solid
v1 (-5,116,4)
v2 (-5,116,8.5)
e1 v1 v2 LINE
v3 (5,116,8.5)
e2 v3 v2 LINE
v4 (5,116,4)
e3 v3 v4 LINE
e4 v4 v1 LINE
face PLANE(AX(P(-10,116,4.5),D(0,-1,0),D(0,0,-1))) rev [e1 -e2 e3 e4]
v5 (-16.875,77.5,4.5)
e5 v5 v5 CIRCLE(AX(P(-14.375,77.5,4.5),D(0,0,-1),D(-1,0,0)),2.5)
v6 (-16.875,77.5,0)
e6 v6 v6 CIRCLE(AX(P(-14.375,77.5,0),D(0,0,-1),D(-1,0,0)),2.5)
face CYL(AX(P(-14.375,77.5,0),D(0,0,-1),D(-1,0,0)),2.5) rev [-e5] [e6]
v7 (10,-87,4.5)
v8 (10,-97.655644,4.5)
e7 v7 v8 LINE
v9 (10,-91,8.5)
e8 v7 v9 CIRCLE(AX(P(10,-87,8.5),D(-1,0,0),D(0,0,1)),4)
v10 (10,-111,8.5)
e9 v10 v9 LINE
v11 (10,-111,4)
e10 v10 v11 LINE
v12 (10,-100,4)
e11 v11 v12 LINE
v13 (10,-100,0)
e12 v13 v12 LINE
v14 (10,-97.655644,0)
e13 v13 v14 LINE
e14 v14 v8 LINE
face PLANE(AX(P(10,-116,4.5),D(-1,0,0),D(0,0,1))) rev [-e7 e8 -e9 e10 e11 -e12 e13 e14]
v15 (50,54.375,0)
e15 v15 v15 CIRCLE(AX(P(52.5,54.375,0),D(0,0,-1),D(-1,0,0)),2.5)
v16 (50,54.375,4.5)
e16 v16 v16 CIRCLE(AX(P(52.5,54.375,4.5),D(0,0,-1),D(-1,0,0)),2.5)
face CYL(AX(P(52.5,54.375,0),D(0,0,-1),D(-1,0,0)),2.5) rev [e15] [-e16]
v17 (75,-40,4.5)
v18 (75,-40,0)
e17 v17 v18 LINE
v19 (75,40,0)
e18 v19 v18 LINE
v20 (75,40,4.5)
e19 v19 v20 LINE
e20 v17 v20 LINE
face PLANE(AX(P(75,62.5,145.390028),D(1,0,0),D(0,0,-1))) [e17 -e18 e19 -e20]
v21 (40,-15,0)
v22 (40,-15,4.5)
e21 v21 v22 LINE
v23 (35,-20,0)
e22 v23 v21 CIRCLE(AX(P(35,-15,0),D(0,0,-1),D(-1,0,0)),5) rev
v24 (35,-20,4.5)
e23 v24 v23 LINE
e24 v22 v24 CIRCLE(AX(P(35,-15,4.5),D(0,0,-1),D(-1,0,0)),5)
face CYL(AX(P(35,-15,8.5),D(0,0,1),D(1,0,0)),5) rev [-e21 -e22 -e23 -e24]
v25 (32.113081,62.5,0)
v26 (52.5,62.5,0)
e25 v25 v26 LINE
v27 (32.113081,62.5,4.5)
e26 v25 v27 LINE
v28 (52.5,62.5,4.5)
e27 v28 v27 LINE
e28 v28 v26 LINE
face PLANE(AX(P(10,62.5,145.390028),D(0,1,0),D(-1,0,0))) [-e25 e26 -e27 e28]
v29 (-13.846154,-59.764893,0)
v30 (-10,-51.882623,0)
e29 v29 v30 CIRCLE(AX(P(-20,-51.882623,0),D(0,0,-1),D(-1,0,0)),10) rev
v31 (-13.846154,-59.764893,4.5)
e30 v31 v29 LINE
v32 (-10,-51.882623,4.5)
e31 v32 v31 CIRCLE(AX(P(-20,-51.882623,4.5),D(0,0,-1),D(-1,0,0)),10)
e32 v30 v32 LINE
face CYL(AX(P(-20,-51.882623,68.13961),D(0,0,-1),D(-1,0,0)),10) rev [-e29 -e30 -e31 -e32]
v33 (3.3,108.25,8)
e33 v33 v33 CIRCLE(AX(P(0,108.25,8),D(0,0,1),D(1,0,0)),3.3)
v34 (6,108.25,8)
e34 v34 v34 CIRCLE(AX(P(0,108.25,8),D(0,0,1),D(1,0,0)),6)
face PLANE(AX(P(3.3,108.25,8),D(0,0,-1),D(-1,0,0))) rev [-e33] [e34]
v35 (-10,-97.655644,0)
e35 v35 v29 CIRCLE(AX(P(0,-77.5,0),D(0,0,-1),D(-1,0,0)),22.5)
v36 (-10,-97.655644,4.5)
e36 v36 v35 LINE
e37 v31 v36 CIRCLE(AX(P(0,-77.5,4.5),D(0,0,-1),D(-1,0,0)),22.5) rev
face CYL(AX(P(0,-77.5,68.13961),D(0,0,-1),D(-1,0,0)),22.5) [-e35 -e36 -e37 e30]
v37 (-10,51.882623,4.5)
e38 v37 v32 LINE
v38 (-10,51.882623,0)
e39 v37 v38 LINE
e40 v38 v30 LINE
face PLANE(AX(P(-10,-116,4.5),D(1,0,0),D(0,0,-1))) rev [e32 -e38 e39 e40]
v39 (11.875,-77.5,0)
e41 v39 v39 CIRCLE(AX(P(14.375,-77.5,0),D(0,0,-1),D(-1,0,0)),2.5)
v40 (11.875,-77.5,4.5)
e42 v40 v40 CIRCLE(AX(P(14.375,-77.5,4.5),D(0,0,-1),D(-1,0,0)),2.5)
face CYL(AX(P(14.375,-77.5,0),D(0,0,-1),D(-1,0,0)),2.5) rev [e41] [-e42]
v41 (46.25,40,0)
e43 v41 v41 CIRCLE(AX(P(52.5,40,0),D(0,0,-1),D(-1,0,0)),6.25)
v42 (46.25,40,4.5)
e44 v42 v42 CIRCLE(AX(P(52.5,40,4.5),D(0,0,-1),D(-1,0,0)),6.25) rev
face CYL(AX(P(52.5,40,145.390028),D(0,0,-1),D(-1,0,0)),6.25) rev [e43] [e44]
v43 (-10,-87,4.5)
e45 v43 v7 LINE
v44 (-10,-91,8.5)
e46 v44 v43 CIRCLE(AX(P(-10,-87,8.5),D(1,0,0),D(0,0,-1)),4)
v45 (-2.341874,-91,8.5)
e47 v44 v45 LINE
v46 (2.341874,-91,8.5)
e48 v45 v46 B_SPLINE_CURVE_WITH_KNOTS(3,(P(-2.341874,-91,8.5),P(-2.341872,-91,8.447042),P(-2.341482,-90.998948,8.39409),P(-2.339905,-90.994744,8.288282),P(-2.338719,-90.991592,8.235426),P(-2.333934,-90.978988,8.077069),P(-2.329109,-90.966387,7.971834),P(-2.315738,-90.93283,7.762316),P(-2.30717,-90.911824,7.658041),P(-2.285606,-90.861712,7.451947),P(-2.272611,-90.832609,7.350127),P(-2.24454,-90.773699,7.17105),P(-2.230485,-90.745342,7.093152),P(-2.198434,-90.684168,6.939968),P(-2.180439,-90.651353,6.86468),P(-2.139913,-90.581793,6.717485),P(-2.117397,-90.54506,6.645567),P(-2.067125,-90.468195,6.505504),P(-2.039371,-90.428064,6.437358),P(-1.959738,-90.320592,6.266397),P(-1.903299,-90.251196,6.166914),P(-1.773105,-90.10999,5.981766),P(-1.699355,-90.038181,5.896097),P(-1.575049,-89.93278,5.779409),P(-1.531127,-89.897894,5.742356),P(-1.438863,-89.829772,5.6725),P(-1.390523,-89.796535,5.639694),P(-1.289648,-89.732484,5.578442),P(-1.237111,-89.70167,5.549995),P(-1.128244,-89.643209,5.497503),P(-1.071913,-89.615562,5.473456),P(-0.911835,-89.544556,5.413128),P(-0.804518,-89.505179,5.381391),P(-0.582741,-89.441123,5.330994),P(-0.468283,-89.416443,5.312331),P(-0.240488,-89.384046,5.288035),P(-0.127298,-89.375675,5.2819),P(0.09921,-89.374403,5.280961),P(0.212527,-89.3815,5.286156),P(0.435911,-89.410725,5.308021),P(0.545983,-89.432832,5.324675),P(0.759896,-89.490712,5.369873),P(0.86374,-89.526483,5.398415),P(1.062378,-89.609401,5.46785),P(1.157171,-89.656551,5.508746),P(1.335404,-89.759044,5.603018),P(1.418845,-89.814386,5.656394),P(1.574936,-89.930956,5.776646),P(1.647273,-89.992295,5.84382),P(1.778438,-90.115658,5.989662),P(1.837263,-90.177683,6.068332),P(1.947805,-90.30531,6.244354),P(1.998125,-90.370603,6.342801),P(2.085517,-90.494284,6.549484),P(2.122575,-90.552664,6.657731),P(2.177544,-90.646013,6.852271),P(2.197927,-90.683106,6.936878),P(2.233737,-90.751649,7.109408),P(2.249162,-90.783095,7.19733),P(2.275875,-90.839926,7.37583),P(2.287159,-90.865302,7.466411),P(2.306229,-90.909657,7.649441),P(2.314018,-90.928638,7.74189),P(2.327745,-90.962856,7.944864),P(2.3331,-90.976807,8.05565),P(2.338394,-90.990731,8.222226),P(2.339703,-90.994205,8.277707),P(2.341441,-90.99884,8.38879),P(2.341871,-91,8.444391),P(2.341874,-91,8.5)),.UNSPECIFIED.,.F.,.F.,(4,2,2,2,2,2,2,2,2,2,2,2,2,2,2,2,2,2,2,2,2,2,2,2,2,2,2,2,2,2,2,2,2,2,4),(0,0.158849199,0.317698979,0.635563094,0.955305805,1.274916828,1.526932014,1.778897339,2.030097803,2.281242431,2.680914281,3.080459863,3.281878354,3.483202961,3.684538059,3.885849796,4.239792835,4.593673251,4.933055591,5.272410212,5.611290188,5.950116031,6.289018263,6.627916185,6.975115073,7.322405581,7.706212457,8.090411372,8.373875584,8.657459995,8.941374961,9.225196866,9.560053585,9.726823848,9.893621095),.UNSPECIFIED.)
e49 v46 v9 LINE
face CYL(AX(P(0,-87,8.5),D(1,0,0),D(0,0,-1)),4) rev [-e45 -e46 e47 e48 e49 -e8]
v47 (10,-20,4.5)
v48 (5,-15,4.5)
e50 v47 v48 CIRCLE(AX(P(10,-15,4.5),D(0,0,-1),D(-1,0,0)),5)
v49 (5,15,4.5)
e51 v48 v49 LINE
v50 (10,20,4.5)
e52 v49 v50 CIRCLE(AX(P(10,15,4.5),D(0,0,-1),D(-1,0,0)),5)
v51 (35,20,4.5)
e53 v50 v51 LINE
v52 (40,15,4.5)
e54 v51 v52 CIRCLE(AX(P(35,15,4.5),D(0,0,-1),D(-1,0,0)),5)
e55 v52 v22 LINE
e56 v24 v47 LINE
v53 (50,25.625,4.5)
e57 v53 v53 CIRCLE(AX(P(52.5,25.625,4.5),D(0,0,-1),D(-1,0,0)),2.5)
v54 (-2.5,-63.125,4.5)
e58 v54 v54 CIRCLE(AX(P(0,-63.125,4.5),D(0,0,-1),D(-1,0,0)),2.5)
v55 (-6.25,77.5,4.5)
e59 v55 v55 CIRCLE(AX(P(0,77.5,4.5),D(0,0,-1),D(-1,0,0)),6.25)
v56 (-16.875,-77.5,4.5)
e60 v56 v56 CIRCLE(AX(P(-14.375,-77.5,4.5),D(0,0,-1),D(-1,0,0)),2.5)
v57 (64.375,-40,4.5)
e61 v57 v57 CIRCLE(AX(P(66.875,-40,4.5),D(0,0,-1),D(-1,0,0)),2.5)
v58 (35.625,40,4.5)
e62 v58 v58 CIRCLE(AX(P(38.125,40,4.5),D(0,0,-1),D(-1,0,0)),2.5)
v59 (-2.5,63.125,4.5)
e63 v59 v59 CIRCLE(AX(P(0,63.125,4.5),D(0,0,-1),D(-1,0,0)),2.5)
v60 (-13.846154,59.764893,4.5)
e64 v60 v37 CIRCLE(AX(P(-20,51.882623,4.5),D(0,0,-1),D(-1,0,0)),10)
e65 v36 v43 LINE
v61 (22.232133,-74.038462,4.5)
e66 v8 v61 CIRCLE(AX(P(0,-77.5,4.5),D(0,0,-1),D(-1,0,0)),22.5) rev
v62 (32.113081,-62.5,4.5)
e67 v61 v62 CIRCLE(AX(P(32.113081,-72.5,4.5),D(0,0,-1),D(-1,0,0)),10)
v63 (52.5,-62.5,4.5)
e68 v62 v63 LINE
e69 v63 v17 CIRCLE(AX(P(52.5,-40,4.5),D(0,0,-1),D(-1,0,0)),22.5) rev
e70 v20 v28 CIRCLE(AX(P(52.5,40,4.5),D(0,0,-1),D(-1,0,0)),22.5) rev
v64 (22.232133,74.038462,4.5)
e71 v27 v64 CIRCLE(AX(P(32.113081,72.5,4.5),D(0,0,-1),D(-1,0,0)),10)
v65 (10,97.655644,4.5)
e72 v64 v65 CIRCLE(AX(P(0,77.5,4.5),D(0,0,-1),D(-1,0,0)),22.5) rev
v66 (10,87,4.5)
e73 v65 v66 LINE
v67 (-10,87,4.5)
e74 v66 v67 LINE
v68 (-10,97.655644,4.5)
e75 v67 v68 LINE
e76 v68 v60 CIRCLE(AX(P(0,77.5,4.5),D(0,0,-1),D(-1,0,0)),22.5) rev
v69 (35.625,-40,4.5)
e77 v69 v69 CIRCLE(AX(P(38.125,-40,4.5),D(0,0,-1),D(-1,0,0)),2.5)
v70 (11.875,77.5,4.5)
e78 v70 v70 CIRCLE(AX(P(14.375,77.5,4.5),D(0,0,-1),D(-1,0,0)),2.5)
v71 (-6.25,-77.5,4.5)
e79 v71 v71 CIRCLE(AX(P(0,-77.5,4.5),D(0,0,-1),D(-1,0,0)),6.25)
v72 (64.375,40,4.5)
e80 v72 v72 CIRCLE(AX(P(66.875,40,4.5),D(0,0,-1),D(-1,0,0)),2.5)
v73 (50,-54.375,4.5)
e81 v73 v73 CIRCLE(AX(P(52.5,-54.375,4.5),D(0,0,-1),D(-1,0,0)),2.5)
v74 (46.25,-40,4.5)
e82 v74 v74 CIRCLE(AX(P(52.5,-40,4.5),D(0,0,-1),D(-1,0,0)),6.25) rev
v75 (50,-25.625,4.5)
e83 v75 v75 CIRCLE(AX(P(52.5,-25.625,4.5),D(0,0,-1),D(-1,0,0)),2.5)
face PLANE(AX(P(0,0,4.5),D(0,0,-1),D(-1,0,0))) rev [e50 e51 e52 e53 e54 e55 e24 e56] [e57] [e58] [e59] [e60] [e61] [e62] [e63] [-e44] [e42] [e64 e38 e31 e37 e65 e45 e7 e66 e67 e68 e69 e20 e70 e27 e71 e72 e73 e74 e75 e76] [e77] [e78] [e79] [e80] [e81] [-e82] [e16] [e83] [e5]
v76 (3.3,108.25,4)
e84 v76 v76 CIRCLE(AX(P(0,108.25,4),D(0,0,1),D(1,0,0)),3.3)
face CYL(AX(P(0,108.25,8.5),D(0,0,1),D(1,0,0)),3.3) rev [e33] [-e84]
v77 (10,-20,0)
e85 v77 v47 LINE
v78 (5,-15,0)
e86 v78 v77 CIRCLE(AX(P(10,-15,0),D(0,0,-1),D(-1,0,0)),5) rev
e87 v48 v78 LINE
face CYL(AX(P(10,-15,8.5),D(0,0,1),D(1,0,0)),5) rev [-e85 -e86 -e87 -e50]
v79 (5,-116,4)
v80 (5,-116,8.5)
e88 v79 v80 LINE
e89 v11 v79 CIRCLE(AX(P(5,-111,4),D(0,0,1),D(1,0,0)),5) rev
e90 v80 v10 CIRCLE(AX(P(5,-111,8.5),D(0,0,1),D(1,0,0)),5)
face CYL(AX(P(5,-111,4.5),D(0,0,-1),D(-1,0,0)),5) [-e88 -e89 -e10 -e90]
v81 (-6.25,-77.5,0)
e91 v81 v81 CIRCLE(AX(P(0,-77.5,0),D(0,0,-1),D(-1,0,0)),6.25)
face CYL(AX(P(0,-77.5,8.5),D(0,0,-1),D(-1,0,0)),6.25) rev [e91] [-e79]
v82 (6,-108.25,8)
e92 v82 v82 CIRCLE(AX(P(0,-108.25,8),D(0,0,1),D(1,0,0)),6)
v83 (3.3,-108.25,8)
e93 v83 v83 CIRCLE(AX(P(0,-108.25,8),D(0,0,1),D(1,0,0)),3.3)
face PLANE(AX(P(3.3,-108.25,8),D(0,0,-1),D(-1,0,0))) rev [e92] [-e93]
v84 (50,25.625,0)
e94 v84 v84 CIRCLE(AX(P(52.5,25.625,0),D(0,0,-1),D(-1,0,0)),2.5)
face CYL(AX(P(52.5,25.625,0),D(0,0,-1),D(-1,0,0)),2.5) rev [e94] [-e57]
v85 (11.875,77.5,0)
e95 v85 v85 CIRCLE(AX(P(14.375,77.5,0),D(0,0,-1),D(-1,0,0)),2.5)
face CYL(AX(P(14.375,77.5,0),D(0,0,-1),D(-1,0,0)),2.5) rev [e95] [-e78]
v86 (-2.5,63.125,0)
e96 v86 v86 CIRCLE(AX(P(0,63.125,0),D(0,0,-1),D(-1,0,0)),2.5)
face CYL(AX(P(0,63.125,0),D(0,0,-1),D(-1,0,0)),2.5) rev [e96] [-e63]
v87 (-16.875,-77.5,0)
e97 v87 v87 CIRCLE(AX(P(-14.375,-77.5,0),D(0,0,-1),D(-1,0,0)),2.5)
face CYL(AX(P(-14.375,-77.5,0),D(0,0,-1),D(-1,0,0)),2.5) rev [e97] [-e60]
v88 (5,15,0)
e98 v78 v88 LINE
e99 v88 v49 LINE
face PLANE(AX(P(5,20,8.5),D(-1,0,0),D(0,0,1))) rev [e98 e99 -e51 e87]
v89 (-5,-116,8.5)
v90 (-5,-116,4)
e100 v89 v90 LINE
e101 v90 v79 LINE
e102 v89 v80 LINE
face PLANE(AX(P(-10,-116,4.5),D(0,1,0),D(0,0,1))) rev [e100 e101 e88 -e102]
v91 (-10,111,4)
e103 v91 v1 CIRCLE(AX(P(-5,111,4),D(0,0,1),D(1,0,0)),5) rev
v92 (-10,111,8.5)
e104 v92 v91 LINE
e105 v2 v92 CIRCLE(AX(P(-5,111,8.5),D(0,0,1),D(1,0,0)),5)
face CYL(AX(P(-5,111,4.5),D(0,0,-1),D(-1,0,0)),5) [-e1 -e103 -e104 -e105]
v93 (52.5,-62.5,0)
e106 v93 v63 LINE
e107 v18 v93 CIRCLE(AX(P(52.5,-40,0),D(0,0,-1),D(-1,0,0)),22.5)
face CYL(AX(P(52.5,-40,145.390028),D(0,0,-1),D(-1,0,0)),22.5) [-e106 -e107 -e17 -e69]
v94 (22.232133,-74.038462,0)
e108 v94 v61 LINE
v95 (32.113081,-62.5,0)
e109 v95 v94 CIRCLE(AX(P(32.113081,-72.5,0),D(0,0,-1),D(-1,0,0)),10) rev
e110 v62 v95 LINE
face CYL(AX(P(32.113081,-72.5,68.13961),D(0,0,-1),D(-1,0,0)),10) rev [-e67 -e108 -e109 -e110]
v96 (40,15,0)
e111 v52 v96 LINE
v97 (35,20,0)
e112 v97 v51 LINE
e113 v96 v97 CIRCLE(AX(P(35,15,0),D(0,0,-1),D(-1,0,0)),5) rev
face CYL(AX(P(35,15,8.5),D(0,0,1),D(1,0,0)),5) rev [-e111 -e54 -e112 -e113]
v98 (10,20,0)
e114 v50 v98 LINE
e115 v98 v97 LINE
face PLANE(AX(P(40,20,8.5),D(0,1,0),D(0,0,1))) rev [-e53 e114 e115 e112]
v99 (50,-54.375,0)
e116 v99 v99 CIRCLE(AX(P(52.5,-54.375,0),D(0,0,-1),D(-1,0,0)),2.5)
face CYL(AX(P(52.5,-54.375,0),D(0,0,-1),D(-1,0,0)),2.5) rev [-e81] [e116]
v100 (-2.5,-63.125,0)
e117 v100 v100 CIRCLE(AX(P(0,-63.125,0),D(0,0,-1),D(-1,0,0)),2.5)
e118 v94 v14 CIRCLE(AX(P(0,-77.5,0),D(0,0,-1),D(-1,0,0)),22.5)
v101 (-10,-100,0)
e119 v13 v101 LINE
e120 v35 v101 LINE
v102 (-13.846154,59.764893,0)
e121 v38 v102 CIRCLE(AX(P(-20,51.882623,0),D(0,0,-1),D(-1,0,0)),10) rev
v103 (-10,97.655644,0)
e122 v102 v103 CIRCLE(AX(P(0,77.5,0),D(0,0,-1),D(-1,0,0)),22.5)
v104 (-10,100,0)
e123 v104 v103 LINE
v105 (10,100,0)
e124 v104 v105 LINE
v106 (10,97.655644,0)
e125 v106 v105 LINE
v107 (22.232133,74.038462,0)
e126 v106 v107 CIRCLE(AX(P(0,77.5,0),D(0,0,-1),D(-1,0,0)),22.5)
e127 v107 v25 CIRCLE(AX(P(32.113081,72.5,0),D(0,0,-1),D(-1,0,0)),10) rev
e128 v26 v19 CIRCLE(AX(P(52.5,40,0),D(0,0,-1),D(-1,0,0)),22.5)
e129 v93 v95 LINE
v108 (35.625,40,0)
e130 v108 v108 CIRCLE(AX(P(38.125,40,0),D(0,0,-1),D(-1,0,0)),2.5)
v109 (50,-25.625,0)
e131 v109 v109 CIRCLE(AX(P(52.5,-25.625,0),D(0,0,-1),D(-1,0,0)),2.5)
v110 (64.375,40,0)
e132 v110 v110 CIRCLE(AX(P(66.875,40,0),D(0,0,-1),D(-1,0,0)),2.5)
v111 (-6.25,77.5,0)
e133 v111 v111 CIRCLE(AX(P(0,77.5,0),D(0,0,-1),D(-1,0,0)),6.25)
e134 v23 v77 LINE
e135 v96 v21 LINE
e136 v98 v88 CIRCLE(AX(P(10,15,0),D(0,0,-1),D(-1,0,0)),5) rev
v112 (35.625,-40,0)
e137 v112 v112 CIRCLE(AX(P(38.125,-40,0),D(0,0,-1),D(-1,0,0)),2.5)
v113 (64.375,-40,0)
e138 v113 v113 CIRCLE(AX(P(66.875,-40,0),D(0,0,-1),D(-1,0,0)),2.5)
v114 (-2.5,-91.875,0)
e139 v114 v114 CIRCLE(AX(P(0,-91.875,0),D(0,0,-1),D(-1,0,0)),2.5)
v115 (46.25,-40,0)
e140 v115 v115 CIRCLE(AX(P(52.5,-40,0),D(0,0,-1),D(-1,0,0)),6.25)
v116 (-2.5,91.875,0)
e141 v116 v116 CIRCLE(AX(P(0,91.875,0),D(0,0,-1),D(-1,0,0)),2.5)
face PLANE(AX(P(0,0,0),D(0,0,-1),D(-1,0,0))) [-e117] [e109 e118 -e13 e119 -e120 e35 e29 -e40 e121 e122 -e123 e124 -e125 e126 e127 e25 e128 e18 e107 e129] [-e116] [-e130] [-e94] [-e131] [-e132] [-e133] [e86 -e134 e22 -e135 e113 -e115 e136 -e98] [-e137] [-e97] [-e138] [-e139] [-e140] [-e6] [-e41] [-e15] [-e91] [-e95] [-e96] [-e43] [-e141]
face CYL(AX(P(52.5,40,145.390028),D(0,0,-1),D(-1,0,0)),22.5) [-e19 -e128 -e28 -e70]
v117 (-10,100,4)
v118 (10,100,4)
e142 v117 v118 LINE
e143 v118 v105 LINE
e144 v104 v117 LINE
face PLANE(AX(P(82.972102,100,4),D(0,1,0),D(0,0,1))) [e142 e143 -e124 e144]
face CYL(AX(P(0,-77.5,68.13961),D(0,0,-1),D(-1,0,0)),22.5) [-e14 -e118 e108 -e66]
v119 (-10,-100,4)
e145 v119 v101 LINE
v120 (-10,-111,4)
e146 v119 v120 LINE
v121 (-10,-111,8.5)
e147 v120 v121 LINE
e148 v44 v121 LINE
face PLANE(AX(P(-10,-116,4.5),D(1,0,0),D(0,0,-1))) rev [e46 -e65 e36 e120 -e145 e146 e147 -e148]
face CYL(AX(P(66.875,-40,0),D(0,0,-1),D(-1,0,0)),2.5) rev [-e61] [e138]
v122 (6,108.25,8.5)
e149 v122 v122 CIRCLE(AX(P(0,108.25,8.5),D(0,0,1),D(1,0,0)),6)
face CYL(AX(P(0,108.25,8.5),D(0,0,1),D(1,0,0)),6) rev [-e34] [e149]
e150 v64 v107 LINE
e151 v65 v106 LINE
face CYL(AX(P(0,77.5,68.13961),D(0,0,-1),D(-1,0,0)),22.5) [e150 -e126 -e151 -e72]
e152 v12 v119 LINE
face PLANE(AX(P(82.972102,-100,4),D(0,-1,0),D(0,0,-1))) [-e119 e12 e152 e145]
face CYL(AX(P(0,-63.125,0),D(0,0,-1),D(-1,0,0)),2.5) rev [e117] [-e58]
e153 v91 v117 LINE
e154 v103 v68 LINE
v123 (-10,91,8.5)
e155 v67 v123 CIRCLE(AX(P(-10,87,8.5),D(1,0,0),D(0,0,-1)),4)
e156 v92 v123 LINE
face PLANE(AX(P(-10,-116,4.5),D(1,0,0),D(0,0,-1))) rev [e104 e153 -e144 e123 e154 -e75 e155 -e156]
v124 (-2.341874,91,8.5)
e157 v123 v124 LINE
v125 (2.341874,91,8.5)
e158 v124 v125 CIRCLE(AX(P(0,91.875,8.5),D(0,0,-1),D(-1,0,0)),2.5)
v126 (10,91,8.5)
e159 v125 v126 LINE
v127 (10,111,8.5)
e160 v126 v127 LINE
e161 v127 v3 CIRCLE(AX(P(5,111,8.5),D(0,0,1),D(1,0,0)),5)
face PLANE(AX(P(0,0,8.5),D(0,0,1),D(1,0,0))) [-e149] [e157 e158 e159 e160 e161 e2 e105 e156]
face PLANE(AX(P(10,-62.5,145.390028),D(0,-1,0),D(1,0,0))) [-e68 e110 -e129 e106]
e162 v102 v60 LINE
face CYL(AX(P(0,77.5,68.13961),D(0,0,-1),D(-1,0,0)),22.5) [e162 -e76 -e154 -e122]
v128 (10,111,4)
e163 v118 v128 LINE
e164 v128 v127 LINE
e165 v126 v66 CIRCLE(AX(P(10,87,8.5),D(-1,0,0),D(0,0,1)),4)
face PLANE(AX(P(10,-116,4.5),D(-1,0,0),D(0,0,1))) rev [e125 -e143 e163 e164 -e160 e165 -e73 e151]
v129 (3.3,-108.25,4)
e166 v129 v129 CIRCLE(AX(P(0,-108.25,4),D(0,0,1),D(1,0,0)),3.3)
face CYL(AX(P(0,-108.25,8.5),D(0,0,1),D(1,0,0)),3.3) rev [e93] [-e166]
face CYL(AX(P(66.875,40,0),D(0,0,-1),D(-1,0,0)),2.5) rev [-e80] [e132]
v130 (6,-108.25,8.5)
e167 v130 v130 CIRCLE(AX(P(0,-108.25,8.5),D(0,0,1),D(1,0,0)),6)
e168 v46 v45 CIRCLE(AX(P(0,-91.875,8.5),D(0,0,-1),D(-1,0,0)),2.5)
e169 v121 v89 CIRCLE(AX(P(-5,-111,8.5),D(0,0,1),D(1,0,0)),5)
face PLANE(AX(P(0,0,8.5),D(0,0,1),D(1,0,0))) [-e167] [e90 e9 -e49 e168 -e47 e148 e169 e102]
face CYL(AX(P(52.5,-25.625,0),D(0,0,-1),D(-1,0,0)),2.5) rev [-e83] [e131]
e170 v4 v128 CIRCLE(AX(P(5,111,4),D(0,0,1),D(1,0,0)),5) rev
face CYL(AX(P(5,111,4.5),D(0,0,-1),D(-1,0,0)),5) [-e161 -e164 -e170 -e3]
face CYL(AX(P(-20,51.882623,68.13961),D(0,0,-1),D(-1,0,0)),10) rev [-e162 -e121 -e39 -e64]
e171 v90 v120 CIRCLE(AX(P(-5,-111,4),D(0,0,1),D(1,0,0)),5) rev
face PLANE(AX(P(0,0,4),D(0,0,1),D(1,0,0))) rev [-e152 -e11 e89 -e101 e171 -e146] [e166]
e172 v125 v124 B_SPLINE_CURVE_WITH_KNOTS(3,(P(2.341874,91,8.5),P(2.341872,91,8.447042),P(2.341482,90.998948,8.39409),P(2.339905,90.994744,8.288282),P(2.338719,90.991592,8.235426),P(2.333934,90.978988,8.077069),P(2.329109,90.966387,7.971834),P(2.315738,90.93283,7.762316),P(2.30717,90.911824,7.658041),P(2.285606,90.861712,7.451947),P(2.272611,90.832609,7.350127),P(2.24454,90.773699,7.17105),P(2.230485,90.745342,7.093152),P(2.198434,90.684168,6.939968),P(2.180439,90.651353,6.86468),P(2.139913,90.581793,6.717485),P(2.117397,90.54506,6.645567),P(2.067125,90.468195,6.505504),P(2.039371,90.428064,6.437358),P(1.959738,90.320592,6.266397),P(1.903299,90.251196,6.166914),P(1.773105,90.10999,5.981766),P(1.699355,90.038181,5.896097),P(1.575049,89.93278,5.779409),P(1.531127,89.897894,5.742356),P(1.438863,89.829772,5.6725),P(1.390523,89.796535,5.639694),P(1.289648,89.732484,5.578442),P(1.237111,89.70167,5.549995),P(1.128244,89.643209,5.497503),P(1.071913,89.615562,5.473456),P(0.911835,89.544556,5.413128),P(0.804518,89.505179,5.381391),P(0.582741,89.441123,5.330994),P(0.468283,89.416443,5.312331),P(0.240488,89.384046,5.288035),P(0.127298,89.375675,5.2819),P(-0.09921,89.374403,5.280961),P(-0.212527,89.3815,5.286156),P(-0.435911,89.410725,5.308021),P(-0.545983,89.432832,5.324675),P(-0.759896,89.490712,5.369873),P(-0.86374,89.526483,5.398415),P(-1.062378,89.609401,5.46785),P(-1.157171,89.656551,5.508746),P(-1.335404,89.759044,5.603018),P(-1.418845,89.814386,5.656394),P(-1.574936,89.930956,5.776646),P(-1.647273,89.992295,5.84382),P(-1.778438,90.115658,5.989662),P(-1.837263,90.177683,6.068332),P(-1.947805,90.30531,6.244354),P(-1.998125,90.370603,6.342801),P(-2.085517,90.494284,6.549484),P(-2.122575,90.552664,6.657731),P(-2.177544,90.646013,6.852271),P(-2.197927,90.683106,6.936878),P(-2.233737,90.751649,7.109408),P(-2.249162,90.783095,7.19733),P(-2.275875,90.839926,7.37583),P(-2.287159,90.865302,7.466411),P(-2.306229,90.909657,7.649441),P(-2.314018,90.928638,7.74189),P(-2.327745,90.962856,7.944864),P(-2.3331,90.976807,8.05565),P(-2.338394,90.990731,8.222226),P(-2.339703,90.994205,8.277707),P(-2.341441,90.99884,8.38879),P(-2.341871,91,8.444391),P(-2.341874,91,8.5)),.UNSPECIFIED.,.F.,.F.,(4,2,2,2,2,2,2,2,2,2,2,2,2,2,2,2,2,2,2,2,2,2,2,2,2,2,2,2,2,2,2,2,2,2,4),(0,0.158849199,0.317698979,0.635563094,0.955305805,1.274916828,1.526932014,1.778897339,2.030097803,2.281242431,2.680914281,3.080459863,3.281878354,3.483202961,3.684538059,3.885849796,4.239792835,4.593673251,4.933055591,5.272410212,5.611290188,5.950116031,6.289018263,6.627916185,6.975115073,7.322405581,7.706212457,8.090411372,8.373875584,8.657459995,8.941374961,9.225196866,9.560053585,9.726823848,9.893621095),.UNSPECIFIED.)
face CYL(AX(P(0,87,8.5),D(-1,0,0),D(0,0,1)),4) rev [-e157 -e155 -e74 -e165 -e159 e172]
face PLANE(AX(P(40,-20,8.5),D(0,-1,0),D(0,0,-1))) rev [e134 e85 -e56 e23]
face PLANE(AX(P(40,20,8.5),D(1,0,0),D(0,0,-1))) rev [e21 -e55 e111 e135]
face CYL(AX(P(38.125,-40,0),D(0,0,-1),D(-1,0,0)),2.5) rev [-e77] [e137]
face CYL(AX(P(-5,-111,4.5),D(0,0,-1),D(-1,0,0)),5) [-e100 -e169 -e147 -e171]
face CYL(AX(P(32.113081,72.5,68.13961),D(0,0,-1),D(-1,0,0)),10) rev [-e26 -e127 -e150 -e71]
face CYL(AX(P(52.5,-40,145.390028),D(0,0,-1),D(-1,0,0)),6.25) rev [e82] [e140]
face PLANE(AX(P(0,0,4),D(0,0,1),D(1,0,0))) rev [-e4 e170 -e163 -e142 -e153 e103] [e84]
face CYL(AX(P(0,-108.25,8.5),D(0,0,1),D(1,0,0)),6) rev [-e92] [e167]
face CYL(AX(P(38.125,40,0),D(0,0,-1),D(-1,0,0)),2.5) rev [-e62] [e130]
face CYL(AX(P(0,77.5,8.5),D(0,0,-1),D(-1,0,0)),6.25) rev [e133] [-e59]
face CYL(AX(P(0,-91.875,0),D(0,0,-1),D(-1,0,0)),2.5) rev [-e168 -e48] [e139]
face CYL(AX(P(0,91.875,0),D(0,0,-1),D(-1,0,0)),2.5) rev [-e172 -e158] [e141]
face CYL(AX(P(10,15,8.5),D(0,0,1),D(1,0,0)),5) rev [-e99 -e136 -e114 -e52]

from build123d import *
from OCP.BRepFilletAPI import BRepFilletAPI_MakeFillet

# Parameters (mm, degrees)
SKETCH_1_W                   = 20
SKETCH_1_H                   = 232
EXTRUDE_1_DEPTH              = 4.5
FILLET_4_R                   = 5
EXTRUDE_START                = 4
EXTRUDE_4_DEPTH              = 4
SKETCH_9_W                   = 319.021375536
SKETCH_9_H                   = 251.112704656
SKETCH_9_W_2                 = 165.944204682
SKETCH_9_H_2                 = 200
CUT_EXTRUDE_1_DEPTH          = 4
FILLET_5_R                   = 4
HOLE_WIZARD_M6_2_D           = 6.6
HOLE_WIZARD_M6_2_CBORE_D     = 12
HOLE_WIZARD_M6_2_CBORE_DEPTH = 0.5
SKETCH_12_W                  = 65
SKETCH_12_H                  = 125
SKETCH_12_R                  = 6.25
EXTRUDE_5_DEPTH              = 4.5
SKETCH_14_R                  = 22.5
EXTRUDE_6_DEPTH              = 4.5
FILLET_6_R1                  = 10
FILLET_6_R2                  = 22.5
SKETCH_13_R                  = 6.25
CUT_EXTRUDE_2_DEPTH          = 139.39526726
HOLE_WIZARD_M6_1_D           = 5
SKETCH_17_W                  = 35
SKETCH_17_H                  = 40
CUT_EXTRUDE_3_DEPTH          = 139.395267266
FILLET_8_R                   = 5


with BuildPart() as part:
    # 草图1 → 凸台-拉伸1 (new body)
    with BuildSketch(Plane.XY):
        Rectangle(SKETCH_1_W, SKETCH_1_H)
    extrude(amount=EXTRUDE_1_DEPTH)

    # 圆角4
    fillet_4_edges = [part.edges().sort_by_distance(p)[0] for p in [
        (10, -116, 2.25),
        (-10, -116, 2.25),
        (-10, 116, 2.25),
        (10, 116, 2.25),
    ]]
    fillet(fillet_4_edges, radius=FILLET_4_R)

    # 草图8 → 凸台-拉伸4 (add)
    with BuildSketch(Plane.XY.offset(4.5).offset(EXTRUDE_START)):
        with BuildLine():
            Line((10, -91), (-10, -91))
            Line((-10, -91), (-10, -111))
            ThreePointArc((-10, -111), (-8.535533906, -114.535533906), (-5, -116))
            Line((-5, -116), (5, -116))
            ThreePointArc((5, -116), (8.535533906, -114.535533906), (10, -111))
            Line((10, -111), (10, -91))
        make_face()
        with BuildLine():
            Line((-10, 111), (-10, 91))
            Line((-10, 91), (10, 91))
            Line((10, 91), (10, 111))
            ThreePointArc((10, 111), (8.535533906, 114.535533906), (5, 116))
            Line((5, 116), (-5, 116))
            ThreePointArc((-5, 116), (-8.535533906, 114.535533906), (-10, 111))
        make_face()
    extrude(amount=-EXTRUDE_4_DEPTH)

    # 草图9 → 切除-拉伸1 (cut)
    with BuildSketch(Plane(origin=(0, 0, 0), x_dir=(-1, 0, 0), z_dir=(0, 0, -1))):
        Rectangle(SKETCH_9_W, SKETCH_9_H)
        Rectangle(SKETCH_9_W_2, SKETCH_9_H_2, mode=Mode.SUBTRACT)
    extrude(amount=-CUT_EXTRUDE_1_DEPTH, mode=Mode.SUBTRACT)

    # 圆角5
    fillet_5_edges = [part.edges().sort_by_distance(p)[0] for p in [
        (0, -91, 4.5),
        (0, 91, 4.5),
    ]]
    fillet(fillet_5_edges, radius=FILLET_5_R - 0.0001)  # a hair under: the kernel refuses the full size

    # M6 六角头螺栓的柱形沉头孔2 (through all)
    with Locations(Plane.XY.offset(8.5)):
        with Locations((0, 108.25), (0, -108.25)):
            CounterBoreHole(HOLE_WIZARD_M6_2_D / 2, HOLE_WIZARD_M6_2_CBORE_D / 2, HOLE_WIZARD_M6_2_CBORE_DEPTH)

    # 草图12 → 凸台-拉伸5 (add)
    with BuildSketch(Plane(origin=(0, 0, 0), x_dir=(-1, 0, 0), z_dir=(0, 0, -1))):
        with Locations((-42.5, 0)):
            Rectangle(SKETCH_12_W, SKETCH_12_H)
        with Locations((-52.5, 40)):
            Circle(SKETCH_12_R, mode=Mode.SUBTRACT)
        with Locations((-52.5, -40)):
            Circle(SKETCH_12_R, mode=Mode.SUBTRACT)
    extrude(amount=-EXTRUDE_5_DEPTH)

    # 草图14 → 凸台-拉伸6 (add)
    with BuildSketch(Plane(origin=(0, 0, 0), x_dir=(-1, 0, 0), z_dir=(0, 0, -1))):
        with Locations((0, 77.5)):
            Circle(SKETCH_14_R)
        with Locations((0, -77.5)):
            Circle(SKETCH_14_R)
    extrude(amount=-EXTRUDE_6_DEPTH)

    # 圆角6: one fillet with a radius per group of edges: ONE call of the kernel's fillet builder (fillet() takes one radius for all edges)
    fillet_6_edges_1 = [part.edges().sort_by_distance(p)[0] for p in [
        (16.770509831, 62.5, 2.25),
        (-10, 57.344355629, 2.25),
        (16.770509831, -62.5, 2.25),
        (-10, -57.344355629, 2.25),
    ]]
    fillet_6_edges_2 = [part.edges().sort_by_distance(p)[0] for p in [
        (75, 62.5, 2.25),
        (75, -62.5, 2.25),
    ]]
    fillet_6 = BRepFilletAPI_MakeFillet(part.part.solid().wrapped)
    for e in fillet_6_edges_1:
        fillet_6.Add(FILLET_6_R1, e.wrapped)
    for e in fillet_6_edges_2:
        fillet_6.Add(FILLET_6_R2, e.wrapped)
    add(Compound.cast(fillet_6.Shape()), mode=Mode.REPLACE)

    # 草图13 → 切除-拉伸2 (cut, through all)
    with BuildSketch(Plane(origin=(0, 0, 0), x_dir=(-1, 0, 0), z_dir=(0, 0, -1))):
        with Locations((0, 77.5)):
            Circle(SKETCH_13_R)
        with Locations((0, -77.5)):
            Circle(SKETCH_13_R)
    extrude(amount=-CUT_EXTRUDE_2_DEPTH, mode=Mode.SUBTRACT)

    # M6 螺纹孔1 (through all)
    with Locations(Plane(origin=(0, 0, 0), x_dir=(-1, 0, 0), z_dir=(0, 0, -1))):
        with Locations((-66.875, 40), (-52.5, 54.375), (-38.125, 40), (-52.5, 25.625), (-52.5, -25.625), (-38.125, -40), (-66.875, -40), (-52.5, -54.375), (0, -63.125), (14.375, -77.5), (-14.375, -77.5), (0, -91.875), (0, 91.875), (14.375, 77.5), (-14.375, 77.5), (0, 63.125)):
            Hole(HOLE_WIZARD_M6_1_D / 2)

    # 草图17 → 切除-拉伸3 (cut, through all)
    with BuildSketch(Plane(origin=(0, 0, 0), x_dir=(-1, 0, 0), z_dir=(0, 0, -1))):
        with Locations((-22.5, 0)):
            Rectangle(SKETCH_17_W, SKETCH_17_H)
    extrude(amount=-CUT_EXTRUDE_3_DEPTH, mode=Mode.SUBTRACT)

    # 圆角8
    fillet_8_edges = [part.edges().sort_by_distance(p)[0] for p in [
        (40, -20, 2.25),
        (40, 20, 2.25),
        (5, 20, 2.25),
        (5, -20, 2.25),
    ]]
    fillet(fillet_8_edges, radius=FILLET_8_R)


solid = part.part
